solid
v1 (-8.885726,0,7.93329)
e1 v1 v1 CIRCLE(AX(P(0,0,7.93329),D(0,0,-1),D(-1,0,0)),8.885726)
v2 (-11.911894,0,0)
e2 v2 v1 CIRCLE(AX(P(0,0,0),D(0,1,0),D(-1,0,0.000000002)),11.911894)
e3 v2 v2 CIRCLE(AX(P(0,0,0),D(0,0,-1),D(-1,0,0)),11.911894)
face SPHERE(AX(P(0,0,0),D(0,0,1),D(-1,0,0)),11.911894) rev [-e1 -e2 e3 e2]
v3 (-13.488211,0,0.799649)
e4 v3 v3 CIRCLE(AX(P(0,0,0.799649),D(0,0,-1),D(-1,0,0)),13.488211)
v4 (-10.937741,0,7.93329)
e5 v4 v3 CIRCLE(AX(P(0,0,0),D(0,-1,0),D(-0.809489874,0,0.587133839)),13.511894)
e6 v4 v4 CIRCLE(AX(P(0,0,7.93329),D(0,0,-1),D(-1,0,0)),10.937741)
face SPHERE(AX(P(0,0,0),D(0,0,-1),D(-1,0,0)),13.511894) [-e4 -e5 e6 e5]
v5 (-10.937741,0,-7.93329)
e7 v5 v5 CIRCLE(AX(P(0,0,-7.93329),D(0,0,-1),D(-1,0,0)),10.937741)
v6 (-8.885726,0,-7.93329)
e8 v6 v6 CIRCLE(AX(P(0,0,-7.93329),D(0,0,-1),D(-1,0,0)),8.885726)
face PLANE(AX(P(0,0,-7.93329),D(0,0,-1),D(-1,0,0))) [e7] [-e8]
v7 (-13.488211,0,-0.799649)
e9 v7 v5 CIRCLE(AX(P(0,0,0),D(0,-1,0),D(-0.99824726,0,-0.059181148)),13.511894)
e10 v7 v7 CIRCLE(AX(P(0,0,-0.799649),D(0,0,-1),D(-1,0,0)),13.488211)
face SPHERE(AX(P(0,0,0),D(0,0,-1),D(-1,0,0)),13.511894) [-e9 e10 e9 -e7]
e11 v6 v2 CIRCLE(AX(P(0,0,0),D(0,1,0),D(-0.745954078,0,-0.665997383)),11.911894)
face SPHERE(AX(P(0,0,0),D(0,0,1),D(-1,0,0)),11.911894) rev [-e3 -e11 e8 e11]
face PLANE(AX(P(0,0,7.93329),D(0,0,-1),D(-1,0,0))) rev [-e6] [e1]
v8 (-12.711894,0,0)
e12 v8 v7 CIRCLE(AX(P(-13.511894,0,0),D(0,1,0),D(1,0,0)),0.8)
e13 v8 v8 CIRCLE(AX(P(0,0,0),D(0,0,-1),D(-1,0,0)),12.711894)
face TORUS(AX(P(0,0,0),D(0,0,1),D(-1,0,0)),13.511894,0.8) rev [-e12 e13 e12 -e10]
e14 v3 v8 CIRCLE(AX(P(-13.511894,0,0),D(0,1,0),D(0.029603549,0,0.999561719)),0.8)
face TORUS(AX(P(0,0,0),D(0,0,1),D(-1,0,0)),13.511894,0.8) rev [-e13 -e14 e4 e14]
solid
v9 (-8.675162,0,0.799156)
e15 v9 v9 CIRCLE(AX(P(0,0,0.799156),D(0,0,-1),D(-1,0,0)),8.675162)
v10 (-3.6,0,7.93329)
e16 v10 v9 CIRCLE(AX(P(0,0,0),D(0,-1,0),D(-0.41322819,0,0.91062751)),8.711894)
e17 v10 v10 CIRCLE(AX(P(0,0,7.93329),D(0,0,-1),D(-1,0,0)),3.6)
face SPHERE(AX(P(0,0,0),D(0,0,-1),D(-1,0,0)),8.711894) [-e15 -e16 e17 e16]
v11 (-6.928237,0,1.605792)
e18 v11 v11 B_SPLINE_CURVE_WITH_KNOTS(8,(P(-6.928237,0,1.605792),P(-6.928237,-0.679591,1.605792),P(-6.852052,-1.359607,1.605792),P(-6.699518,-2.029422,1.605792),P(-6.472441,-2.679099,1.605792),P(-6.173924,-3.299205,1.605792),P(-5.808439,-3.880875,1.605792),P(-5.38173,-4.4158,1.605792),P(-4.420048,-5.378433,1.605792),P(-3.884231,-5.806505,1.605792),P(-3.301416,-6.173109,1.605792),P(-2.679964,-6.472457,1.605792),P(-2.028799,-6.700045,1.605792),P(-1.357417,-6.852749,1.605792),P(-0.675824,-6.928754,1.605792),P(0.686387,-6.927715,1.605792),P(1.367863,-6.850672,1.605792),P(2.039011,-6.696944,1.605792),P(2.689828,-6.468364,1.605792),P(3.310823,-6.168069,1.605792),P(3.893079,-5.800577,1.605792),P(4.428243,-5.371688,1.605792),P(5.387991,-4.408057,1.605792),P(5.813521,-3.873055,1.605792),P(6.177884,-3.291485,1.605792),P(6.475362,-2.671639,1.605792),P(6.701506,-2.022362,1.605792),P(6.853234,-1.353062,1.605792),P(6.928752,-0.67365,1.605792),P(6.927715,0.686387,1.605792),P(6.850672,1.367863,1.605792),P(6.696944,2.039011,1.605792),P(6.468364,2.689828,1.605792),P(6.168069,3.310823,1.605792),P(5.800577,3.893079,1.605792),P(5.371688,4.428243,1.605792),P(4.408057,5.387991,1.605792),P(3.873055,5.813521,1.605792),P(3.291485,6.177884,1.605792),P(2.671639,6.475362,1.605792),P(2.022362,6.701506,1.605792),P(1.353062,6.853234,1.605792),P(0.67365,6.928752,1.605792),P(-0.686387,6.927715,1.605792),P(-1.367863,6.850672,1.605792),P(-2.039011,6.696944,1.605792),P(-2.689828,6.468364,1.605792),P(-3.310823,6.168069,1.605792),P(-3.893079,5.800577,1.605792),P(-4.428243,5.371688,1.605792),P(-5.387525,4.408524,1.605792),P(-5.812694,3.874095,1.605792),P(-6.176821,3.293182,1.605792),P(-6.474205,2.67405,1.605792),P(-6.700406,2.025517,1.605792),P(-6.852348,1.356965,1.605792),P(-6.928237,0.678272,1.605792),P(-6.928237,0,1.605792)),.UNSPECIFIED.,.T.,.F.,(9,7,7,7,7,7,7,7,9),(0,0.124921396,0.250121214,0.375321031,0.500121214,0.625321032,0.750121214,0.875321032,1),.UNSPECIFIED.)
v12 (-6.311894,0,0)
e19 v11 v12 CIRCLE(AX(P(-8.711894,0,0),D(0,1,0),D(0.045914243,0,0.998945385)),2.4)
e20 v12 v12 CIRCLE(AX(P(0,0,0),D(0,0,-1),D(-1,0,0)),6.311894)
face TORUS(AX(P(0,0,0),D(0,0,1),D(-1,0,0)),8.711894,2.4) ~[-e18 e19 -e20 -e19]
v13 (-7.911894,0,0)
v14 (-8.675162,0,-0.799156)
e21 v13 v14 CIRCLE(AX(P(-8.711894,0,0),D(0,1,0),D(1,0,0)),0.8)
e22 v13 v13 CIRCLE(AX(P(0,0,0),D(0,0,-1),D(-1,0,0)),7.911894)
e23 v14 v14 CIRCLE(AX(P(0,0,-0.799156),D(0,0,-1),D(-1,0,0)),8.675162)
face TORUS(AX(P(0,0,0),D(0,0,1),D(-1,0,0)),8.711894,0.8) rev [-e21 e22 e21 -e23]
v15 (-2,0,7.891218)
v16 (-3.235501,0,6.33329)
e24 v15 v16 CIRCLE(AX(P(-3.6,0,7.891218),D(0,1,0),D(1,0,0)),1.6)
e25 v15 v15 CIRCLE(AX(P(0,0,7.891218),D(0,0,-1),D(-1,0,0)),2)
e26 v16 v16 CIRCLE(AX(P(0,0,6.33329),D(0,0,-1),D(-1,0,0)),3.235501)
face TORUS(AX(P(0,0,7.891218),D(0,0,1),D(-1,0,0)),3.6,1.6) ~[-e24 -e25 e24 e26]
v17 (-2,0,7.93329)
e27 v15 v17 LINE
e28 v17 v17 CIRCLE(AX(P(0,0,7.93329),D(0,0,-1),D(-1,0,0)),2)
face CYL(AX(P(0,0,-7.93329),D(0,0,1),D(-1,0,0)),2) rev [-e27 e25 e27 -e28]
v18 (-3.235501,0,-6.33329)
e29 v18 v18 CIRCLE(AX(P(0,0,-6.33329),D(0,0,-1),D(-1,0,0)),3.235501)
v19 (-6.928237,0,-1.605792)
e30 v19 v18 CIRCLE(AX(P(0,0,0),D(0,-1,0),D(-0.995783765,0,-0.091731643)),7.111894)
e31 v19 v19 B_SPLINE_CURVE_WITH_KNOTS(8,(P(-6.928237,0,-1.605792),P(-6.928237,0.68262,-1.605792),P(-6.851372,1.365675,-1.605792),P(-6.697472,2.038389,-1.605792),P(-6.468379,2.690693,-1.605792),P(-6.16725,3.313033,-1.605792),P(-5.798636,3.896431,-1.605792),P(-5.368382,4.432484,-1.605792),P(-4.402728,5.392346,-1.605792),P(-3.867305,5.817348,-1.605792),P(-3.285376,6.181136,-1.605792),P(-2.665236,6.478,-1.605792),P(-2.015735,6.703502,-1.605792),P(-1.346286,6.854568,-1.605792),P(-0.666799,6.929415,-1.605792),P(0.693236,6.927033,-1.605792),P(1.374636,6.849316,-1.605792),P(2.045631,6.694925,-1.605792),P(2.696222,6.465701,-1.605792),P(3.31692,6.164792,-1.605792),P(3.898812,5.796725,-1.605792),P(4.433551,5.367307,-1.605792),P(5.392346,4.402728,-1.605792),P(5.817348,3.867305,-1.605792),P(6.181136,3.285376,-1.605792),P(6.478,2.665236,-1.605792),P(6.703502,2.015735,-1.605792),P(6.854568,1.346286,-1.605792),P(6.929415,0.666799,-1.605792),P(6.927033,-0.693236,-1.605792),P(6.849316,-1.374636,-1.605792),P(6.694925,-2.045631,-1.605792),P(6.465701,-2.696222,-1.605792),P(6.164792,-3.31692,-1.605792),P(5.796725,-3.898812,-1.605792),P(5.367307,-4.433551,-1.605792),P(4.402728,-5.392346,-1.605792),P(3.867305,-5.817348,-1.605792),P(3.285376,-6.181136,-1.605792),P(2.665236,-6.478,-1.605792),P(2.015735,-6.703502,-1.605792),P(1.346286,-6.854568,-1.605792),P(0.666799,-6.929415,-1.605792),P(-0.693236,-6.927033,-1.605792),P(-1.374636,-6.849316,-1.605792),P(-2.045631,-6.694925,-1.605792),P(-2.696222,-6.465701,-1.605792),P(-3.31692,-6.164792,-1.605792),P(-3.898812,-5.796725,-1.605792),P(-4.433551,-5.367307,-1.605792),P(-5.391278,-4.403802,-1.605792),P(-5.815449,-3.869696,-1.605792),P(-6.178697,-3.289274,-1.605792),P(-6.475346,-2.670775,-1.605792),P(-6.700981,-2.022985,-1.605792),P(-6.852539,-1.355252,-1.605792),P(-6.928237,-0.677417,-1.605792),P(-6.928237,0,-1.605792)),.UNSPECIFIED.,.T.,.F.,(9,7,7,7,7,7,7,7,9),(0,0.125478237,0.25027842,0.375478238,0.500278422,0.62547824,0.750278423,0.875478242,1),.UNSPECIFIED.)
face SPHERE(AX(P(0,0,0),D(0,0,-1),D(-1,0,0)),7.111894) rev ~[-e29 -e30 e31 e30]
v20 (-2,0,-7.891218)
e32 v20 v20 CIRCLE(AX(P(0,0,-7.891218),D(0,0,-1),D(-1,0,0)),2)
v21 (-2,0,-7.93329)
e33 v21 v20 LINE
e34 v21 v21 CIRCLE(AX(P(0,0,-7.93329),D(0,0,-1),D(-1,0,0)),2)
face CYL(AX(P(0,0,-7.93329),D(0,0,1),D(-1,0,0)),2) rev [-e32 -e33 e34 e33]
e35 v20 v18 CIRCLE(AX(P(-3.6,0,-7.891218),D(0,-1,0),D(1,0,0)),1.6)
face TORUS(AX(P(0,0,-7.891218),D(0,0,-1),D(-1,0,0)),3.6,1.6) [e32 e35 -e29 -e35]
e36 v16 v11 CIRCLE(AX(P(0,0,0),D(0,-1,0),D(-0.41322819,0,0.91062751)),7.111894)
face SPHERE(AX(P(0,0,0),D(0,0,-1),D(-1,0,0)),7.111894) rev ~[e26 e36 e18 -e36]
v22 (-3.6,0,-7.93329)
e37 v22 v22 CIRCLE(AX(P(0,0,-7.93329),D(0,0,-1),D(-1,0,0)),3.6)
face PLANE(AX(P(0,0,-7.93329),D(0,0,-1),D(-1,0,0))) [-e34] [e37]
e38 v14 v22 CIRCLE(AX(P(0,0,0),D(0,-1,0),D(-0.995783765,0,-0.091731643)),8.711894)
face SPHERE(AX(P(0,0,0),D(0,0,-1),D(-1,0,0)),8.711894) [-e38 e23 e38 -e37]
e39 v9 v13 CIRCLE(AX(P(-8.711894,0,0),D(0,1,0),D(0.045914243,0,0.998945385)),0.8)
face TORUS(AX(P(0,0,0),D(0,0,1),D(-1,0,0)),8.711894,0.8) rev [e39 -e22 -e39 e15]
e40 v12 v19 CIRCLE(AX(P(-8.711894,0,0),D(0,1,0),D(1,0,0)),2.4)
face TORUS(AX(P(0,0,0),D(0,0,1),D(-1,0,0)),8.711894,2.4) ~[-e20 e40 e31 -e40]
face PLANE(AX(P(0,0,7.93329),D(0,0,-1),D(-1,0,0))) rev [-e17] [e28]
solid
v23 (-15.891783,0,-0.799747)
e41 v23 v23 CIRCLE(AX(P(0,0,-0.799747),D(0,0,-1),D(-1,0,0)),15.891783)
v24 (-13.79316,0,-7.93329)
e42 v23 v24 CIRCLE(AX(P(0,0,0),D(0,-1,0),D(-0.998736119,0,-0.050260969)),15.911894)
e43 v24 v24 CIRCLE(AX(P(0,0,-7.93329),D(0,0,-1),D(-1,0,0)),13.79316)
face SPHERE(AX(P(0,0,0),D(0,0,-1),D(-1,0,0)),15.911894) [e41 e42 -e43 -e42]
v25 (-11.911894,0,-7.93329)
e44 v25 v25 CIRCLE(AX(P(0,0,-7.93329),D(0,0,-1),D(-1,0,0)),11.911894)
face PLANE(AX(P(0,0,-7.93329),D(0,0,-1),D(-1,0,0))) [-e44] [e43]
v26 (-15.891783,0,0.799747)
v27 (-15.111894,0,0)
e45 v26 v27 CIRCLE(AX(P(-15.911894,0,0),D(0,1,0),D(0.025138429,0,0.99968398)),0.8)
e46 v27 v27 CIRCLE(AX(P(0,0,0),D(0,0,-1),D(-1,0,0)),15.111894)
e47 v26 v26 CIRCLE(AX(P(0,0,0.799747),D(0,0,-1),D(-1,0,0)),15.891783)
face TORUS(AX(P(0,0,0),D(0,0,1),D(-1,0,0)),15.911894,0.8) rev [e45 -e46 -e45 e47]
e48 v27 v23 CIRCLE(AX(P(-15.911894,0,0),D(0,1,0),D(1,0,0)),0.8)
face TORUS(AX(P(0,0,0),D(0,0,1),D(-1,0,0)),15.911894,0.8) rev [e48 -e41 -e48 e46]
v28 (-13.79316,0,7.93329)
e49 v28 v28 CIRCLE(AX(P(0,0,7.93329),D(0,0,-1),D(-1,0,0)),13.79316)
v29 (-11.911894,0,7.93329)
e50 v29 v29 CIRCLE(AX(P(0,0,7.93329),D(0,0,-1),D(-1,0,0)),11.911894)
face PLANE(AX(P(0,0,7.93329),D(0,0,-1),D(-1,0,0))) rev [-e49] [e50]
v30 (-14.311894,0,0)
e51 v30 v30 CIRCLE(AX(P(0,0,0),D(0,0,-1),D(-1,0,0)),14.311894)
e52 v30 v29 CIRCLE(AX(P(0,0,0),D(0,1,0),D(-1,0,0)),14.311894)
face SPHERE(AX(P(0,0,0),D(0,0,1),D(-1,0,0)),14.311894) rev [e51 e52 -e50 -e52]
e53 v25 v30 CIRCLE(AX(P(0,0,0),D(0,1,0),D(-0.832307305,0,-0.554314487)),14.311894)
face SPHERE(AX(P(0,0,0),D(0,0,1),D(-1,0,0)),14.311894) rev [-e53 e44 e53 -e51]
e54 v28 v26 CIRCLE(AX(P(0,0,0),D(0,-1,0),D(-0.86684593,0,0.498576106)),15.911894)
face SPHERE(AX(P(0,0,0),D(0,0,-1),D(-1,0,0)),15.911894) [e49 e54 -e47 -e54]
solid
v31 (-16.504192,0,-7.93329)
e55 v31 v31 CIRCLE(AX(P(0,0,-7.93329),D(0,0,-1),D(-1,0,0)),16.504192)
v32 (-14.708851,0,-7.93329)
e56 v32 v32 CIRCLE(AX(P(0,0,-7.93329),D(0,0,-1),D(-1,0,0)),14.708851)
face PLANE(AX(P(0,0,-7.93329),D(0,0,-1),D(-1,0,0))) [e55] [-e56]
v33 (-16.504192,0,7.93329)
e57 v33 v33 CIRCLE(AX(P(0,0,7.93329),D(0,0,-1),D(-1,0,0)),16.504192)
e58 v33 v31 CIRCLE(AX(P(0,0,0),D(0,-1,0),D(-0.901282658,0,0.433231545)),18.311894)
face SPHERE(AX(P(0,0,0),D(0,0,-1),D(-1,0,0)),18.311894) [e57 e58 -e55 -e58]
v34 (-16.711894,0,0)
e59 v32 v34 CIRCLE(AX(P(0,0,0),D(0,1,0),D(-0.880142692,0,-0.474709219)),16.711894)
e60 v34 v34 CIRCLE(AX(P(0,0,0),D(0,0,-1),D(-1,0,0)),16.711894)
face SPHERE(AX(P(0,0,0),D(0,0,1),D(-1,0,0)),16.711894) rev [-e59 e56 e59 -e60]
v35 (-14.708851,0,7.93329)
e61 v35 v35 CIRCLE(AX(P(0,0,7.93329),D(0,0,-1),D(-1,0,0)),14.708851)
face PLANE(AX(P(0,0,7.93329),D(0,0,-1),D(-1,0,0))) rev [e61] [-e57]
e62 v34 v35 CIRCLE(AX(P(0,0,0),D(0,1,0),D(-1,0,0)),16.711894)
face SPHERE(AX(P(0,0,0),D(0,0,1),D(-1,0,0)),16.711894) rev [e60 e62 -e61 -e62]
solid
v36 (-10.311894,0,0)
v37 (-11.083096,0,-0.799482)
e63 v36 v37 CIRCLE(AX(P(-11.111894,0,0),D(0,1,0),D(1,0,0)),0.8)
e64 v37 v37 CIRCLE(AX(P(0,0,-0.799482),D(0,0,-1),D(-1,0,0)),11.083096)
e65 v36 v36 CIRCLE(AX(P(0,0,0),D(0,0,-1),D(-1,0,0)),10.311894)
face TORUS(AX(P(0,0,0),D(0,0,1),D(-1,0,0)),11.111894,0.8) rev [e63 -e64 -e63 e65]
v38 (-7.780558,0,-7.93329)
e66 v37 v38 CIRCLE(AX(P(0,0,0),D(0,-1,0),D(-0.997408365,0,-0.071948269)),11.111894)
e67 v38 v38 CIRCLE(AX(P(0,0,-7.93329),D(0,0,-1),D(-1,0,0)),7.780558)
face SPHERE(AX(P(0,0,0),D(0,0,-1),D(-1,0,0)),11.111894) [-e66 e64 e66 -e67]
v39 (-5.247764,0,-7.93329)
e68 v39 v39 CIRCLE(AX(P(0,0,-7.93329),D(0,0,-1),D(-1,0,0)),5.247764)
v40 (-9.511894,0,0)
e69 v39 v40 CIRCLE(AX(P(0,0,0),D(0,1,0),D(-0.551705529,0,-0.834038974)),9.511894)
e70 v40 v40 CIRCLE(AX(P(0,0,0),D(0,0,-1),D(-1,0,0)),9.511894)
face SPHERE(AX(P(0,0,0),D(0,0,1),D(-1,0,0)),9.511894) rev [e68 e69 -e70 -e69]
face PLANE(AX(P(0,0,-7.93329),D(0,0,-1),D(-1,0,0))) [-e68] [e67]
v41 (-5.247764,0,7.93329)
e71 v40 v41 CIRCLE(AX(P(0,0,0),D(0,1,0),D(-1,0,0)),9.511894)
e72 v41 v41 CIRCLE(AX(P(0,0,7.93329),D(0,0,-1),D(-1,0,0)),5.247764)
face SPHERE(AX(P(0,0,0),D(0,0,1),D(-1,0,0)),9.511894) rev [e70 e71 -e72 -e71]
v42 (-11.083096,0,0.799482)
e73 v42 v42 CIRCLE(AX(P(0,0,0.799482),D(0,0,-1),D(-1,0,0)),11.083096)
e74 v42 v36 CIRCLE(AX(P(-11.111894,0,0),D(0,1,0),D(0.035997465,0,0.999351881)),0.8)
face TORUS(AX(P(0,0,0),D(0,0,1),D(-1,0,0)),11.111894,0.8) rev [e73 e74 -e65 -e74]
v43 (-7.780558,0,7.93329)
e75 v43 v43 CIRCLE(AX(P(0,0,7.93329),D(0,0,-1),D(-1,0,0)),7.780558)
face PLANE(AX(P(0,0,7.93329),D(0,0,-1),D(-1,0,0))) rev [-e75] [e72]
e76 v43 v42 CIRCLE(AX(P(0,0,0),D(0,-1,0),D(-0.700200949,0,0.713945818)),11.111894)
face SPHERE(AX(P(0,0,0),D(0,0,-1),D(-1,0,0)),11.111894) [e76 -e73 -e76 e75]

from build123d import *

# Parameters (mm, degrees)
F3_T = -1.6


# Not quite as in the source:
# - a fillet or chamfer that OpenCascade refuses, or shapes differently, is made with other operations: its cross-section is extruded or revolved along the edge and cut away or added


with BuildPart() as f2:
    # F1 (on Front) → F2 (revolve)
    with BuildSketch(Plane.XZ):
        with BuildLine():
            Line((-2, 7.9332899209), (-3.6, 7.9332899209))
            ThreePointArc((-3.6, 7.9332899209), (-7.098863782, 5.050071482), (-8.6751621405, 0.799156308))
            ThreePointArc((-8.6751621405, 0.799156308), (-8.1333673406, 0.5525463258), (-7.9118935352, 0))
            ThreePointArc((-7.9118935352, 0), (-8.1333673406, -0.5525463258), (-8.6751621405, -0.799156308))
            ThreePointArc((-8.6751621405, -0.799156308), (-7.098863782, -5.050071482), (-3.6, -7.9332899209))
            Line((-3.6, -7.9332899209), (-2, -7.9332899209))
            Line((-2, -7.9332899209), (-2, 0))
            Line((-2, 0), (-2, 7.9332899209))
        make_face()
    revolve(axis=Axis((0, 0, -1.2736130784), (0, 0, -1)))

    # F3
    f3_openings = [f2.faces().sort_by_distance(p)[0] for p in [
        (2, 0, 0),
    ]]
    offset(amount=F3_T, openings=f3_openings)

    # F4: fillet of radius 1.6 on 2 edges, made by hand

    # F4_s1 → F4_t2 (revolve, cut)
    with BuildSketch(Plane.XZ):
        with BuildLine():
            ThreePointArc((-2, -7.8912182479), (-2.346365688, -6.8970346573), (-3.2355012647, -6.3332899209))
            Line((-3.2355012647, -6.3332899209), (-3.22821129, -6.3021313544))
            ThreePointArc((-3.22821129, -6.3021313544), (-2.6177506324, -6.3012899209), (-2, -6.3012899209))
            Line((-2, -6.3012899209), (-1.968, -6.3332899209))
            Line((-1.968, -6.3332899209), (-1.968, -7.8912182479))
            Line((-1.968, -7.8912182479), (-2, -7.8912182479))
        make_face()
    revolve(axis=Axis((0, 0, -6.3332899209), (0, 0, -1)), mode=Mode.SUBTRACT)

    # F4_s3 → F4_t4 (revolve, cut)
    with BuildSketch(Plane.XZ):
        with BuildLine():
            ThreePointArc((-2, 7.8912182479), (-2.346365688, 6.8970346573), (-3.2355012647, 6.3332899209))
            Line((-3.2355012647, 6.3332899209), (-3.22821129, 6.3021313544))
            ThreePointArc((-3.22821129, 6.3021313544), (-2.6177506324, 6.3012899209), (-2, 6.3012899209))
            Line((-2, 6.3012899209), (-1.968, 6.3332899209))
            Line((-1.968, 6.3332899209), (-1.968, 7.8912182479))
            Line((-1.968, 7.8912182479), (-2, 7.8912182479))
        make_face()
    revolve(axis=Axis((0, 0, 6.3332899209), (0, 0, -1)), mode=Mode.SUBTRACT)


with BuildPart() as f2b:
    # F1 (on Front) → F2, piece 2 (revolve)
    with BuildSketch(Plane.XZ):
        with BuildLine():
            ThreePointArc((-9.5118935352, 0), (-8.3783140756, 4.5033289771), (-5.2477642531, 7.9332899209))
            Line((-5.2477642531, 7.9332899209), (-7.780558397, 7.9332899209))
            ThreePointArc((-7.780558397, 7.9332899209), (-10.0837575244, 4.6681915264), (-11.0830955631, 0.799481505))
            ThreePointArc((-11.0830955631, 0.799481505), (-10.5361165047, 0.5554104889), (-10.3118935352, 0))
            ThreePointArc((-10.3118935352, 0), (-10.5361165047, -0.5554104889), (-11.0830955631, -0.799481505))
            ThreePointArc((-11.0830955631, -0.799481505), (-10.0837575244, -4.6681915264), (-7.780558397, -7.9332899209))
            Line((-7.780558397, -7.9332899209), (-5.2477642531, -7.9332899209))
            ThreePointArc((-5.2477642531, -7.9332899209), (-8.3783140756, -4.5033289771), (-9.5118935352, 0))
        make_face()
    revolve(axis=Axis((0, 0, -1.2736130784), (0, 0, -1)))


with BuildPart() as f2c:
    # F1 (on Front) → F2, piece 3 (revolve)
    with BuildSketch(Plane.XZ):
        with BuildLine():
            ThreePointArc((-11.9118935352, 1.99e-08), (-11.1296681043, 4.2454323082), (-8.8857255542, 7.9332899209))
            Line((-8.8857255542, 7.9332899209), (-10.9377409888, 7.9332899209))
            ThreePointArc((-10.9377409888, 7.9332899209), (-12.723167286, 4.5488769074), (-13.4882106962, 0.7996493751))
            ThreePointArc((-13.4882106962, 0.7996493751), (-12.9378960303, 0.5572493736), (-12.7118935352, 0))
            ThreePointArc((-12.7118935352, 0), (-12.9378960303, -0.5572493736), (-13.4882106962, -0.7996493751))
            ThreePointArc((-13.4882106962, -0.7996493751), (-12.723167286, -4.5488769074), (-10.9377409888, -7.9332899209))
            Line((-10.9377409888, -7.9332899209), (-8.8857255542, -7.9332899209))
            ThreePointArc((-8.8857255542, -7.9332899209), (-11.1296681114, -4.2454322896), (-11.9118935352, 1.99e-08))
        make_face()
    revolve(axis=Axis((0, 0, -1.2736130784), (0, 0, -1)))


with BuildPart() as f2d:
    # F1 (on Front) → F2, piece 4 (revolve)
    with BuildSketch(Plane.XZ):
        with BuildLine():
            ThreePointArc((-14.3118935352, 0), (-13.6987599556, 4.1441853533), (-11.9118935352, 7.9332899209))
            Line((-11.9118935352, 7.9332899209), (-13.7931601494, 7.9332899209))
            ThreePointArc((-13.7931601494, 7.9332899209), (-15.2650194025, 4.4908282663), (-15.8917827923, 0.7997471838))
            ThreePointArc((-15.8917827923, 0.7997471838), (-15.3391420209, 0.558529948), (-15.1118935352, 0))
            ThreePointArc((-15.1118935352, 0), (-15.3391420209, -0.558529948), (-15.8917827923, -0.7997471838))
            ThreePointArc((-15.8917827923, -0.7997471838), (-15.2650194025, -4.4908282663), (-13.7931601494, -7.9332899209))
            Line((-13.7931601494, -7.9332899209), (-11.9118935352, -7.9332899209))
            ThreePointArc((-11.9118935352, -7.9332899209), (-13.6987599556, -4.1441853533), (-14.3118935352, 0))
        make_face()
    revolve(axis=Axis((0, 0, -1.2736130784), (0, 0, -1)))


with BuildPart() as f2e:
    # F1 (on Front) → F2, piece 5 (revolve)
    with BuildSketch(Plane.XZ):
        with BuildLine():
            ThreePointArc((-16.7118935352, 0), (-16.2033968167, 4.0911266336), (-14.70885096, 7.9332899209))
            Line((-14.70885096, 7.9332899209), (-16.5041920698, 7.9332899209))
            ThreePointArc((-16.5041920698, 7.9332899209), (-18.3118935352, 0), (-16.5041920698, -7.9332899209))
            Line((-16.5041920698, -7.9332899209), (-14.70885096, -7.9332899209))
            ThreePointArc((-14.70885096, -7.9332899209), (-16.2033968167, -4.0911266336), (-16.7118935352, 0))
        make_face()
    revolve(axis=Axis((0, 0, -1.2736130784), (0, 0, -1)))


solid = Compound([f2.part, f2b.part, f2c.part, f2d.part, f2e.part])
